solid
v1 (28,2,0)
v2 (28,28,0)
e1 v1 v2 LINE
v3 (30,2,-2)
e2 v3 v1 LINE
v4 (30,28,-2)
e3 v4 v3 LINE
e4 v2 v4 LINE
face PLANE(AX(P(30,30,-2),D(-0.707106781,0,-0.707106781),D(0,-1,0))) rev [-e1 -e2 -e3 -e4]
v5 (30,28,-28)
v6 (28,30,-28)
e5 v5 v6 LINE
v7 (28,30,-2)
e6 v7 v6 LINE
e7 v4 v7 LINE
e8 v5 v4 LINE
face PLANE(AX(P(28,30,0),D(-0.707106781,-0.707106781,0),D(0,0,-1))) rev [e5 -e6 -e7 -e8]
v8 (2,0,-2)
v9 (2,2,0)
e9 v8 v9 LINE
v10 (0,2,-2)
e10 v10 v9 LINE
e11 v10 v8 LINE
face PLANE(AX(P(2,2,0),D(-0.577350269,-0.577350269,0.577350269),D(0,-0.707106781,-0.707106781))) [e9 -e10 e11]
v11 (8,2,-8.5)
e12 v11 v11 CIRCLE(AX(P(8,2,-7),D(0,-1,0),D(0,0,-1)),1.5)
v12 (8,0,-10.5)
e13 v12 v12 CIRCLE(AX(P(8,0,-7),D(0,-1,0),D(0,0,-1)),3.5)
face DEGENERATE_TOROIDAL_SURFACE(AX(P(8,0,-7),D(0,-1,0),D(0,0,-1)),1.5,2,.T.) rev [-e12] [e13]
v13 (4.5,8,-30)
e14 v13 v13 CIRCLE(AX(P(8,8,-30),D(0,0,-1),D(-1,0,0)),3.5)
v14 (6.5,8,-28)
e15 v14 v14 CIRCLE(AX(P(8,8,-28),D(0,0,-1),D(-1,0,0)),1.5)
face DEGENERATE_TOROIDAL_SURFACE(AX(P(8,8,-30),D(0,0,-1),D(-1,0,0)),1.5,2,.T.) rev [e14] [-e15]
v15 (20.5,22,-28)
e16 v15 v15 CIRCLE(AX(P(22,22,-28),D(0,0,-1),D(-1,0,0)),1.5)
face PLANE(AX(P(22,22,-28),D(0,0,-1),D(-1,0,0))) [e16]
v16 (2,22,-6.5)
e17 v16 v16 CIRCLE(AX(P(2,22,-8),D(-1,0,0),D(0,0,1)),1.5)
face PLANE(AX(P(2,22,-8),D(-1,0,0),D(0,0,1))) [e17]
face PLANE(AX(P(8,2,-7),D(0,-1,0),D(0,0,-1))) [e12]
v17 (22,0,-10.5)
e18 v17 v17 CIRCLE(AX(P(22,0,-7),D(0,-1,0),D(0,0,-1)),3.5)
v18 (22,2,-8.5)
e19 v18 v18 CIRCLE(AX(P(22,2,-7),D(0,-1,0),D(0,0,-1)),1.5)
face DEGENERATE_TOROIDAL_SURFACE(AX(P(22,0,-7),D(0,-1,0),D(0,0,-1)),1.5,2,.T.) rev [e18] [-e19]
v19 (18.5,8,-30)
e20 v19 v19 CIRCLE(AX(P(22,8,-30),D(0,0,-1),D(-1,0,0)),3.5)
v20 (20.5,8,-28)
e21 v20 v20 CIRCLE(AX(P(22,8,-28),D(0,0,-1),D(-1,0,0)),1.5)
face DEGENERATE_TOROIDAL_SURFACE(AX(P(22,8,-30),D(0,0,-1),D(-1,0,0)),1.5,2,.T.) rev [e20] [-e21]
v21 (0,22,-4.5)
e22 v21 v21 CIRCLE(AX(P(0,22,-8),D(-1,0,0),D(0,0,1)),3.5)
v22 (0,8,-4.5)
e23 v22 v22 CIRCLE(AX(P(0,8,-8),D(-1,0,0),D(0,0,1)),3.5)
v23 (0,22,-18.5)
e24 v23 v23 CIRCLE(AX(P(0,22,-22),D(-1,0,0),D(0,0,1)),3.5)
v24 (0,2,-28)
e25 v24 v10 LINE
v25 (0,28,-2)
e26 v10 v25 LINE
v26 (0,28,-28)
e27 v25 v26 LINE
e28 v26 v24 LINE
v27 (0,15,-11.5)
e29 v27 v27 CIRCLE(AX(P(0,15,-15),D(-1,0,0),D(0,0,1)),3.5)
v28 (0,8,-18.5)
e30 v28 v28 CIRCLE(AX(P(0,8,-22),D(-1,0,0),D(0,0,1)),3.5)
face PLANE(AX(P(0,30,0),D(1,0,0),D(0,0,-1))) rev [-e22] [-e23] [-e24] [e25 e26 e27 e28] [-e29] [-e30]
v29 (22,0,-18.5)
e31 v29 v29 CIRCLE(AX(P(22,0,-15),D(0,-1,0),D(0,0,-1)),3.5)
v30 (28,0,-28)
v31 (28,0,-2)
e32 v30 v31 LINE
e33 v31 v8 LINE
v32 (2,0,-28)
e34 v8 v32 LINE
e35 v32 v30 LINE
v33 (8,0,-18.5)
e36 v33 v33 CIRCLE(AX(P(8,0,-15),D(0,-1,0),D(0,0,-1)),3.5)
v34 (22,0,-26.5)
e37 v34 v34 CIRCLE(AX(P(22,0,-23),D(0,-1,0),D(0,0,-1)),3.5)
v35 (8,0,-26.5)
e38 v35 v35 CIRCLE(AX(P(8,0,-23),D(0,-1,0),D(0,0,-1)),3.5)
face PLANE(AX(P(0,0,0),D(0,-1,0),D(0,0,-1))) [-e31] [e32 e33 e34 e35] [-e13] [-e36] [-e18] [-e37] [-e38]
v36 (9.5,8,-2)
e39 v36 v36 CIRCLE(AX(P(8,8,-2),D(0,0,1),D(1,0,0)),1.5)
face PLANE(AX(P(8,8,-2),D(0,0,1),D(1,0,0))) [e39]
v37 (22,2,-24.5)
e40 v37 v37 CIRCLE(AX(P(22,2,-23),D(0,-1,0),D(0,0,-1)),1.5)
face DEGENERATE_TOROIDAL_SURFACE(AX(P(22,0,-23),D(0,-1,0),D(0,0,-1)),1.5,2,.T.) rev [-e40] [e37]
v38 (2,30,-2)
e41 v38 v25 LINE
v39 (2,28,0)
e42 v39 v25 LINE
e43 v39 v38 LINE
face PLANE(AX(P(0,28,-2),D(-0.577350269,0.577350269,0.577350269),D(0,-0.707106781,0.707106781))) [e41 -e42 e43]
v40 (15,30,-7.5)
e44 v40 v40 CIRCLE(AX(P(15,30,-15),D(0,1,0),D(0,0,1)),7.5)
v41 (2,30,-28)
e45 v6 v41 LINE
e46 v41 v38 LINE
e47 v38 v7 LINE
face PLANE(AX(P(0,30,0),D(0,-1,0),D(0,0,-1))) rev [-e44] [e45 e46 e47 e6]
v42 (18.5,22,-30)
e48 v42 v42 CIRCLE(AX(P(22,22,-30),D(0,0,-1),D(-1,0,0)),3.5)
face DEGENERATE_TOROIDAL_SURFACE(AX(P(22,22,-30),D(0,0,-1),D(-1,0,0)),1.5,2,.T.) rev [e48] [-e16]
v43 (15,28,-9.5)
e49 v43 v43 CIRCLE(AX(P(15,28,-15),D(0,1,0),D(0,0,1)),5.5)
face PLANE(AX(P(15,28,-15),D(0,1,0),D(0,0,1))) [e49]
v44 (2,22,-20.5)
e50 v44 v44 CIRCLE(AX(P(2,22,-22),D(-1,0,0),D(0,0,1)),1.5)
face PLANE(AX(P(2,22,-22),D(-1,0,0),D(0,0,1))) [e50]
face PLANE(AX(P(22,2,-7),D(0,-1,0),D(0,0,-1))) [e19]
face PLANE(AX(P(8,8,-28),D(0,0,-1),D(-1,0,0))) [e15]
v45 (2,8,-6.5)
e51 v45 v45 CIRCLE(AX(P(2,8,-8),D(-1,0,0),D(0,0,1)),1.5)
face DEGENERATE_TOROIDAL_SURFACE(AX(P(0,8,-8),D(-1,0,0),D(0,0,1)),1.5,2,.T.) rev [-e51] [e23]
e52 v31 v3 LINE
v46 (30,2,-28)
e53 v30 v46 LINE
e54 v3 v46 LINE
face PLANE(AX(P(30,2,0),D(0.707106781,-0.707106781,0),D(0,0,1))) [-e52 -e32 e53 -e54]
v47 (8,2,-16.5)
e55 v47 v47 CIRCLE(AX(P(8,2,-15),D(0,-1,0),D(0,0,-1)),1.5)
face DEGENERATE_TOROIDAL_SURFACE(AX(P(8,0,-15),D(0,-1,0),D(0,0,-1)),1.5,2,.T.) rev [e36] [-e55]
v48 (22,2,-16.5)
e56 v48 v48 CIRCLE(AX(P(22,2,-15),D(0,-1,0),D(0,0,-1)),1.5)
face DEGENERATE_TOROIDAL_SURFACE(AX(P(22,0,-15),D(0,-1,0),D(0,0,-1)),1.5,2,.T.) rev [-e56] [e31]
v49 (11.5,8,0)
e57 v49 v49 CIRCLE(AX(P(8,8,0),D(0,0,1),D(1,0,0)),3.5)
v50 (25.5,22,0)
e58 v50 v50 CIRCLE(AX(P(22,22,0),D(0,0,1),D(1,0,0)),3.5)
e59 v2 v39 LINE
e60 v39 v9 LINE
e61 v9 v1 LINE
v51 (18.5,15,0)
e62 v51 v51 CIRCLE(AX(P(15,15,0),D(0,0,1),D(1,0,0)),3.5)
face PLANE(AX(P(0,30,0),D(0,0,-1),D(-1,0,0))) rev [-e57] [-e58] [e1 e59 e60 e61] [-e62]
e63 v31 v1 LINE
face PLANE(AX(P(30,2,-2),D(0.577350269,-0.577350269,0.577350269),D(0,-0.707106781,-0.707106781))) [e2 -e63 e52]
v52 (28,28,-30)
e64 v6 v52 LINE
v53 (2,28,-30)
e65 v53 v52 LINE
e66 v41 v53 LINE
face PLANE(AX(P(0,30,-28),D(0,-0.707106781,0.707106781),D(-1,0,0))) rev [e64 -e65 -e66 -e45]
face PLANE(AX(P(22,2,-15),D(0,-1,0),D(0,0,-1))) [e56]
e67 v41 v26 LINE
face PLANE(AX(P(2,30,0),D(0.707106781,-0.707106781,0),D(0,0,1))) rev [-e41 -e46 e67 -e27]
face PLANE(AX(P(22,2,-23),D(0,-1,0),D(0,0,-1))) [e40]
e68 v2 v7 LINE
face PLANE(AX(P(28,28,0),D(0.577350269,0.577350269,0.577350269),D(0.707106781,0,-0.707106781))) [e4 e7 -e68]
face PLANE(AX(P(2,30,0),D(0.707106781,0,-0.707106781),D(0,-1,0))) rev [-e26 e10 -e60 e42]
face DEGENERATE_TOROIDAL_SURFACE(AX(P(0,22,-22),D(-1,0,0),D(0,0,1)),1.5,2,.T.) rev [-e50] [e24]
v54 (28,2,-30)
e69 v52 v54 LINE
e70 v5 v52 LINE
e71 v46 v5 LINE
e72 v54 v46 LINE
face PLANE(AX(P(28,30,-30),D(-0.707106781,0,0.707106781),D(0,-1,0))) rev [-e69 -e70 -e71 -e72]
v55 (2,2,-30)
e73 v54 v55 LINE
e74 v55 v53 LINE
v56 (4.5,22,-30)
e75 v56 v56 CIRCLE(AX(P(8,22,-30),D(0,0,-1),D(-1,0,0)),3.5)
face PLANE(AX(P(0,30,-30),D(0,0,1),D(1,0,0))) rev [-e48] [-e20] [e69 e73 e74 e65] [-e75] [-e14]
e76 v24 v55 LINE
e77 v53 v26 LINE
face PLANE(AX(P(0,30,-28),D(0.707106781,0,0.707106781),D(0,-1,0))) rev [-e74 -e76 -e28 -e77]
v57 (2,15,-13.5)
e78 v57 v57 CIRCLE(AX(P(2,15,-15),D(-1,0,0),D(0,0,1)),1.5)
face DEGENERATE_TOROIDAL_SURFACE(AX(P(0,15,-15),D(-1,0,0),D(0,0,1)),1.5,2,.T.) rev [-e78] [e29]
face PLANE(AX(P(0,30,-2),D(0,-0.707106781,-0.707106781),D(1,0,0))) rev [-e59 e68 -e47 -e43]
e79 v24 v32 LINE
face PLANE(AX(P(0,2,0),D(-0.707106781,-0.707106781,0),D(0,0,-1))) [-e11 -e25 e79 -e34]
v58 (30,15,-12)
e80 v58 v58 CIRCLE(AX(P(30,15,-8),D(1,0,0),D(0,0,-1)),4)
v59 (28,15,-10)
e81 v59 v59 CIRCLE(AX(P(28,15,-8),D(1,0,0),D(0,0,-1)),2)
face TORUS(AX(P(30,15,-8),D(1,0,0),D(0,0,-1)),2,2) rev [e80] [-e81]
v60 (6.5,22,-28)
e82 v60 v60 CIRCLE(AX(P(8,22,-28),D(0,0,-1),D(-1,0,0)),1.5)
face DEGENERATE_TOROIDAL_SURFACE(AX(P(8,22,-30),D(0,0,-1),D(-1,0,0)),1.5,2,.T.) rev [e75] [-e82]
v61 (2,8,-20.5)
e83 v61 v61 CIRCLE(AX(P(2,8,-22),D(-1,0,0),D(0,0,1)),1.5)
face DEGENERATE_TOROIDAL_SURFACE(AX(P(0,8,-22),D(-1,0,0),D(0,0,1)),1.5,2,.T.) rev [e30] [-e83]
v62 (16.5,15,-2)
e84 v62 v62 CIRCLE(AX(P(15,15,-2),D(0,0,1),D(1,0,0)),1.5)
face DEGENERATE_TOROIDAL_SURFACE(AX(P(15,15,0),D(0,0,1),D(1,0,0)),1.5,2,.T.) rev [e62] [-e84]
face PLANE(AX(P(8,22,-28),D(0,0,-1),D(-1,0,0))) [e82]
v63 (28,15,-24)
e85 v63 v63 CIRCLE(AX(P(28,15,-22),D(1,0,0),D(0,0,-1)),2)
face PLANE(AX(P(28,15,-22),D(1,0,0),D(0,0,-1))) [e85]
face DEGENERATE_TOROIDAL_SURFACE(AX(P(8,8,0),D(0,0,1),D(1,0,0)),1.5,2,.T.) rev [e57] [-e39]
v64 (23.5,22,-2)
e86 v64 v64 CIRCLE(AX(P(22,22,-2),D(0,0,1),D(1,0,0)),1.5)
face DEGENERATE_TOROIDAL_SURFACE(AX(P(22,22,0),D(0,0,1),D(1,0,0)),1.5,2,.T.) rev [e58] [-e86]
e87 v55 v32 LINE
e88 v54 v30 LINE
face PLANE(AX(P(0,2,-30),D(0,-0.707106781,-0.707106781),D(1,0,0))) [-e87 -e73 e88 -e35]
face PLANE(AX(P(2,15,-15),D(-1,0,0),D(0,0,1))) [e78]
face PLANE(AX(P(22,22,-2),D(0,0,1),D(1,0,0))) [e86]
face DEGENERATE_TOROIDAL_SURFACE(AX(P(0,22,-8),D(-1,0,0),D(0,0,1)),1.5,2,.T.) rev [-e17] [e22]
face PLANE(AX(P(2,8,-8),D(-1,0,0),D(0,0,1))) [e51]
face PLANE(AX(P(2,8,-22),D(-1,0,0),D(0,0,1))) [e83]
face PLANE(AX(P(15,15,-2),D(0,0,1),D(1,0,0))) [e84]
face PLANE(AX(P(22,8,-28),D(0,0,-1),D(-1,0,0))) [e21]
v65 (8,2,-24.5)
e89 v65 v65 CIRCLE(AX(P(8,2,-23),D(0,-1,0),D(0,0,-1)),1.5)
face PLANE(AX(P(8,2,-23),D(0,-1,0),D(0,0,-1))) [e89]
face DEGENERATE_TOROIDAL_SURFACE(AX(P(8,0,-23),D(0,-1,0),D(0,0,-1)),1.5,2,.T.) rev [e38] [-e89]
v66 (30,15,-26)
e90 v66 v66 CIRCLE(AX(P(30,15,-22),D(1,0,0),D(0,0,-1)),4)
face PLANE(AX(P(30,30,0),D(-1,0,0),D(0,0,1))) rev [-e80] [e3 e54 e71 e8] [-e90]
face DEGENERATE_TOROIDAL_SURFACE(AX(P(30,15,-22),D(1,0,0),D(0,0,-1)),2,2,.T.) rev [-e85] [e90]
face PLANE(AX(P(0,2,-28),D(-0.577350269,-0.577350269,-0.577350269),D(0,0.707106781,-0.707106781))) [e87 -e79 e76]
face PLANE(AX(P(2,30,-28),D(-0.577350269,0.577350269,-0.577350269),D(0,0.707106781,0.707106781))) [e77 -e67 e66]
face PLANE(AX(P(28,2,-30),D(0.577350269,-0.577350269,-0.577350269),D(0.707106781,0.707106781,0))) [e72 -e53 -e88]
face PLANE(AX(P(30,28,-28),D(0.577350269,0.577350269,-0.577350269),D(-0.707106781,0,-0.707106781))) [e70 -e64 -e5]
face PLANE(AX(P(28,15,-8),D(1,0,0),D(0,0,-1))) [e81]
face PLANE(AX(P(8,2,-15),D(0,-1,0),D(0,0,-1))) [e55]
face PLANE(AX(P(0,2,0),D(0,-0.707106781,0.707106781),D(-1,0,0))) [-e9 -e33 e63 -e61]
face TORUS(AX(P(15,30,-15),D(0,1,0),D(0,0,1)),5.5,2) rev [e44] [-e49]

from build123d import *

# Parameters (mm, degrees)
SKETCH_2_W          = 30
SKETCH_2_H          = 30
EXTRUDE_1_DEPTH     = 30
CHAMFER_1_SIZE      = 2
SKETCH_3_R          = 7.5
CUT_EXTRUDE_1_DEPTH = 2
FILLET_1_R          = 2
SKETCH_4_R          = 3.5
CUT_EXTRUDE_2_DEPTH = 2
FILLET_2_R          = 2
SKETCH_6_R          = 3.5
CUT_EXTRUDE_3_DEPTH = 2
SKETCH_7_R          = 4
CUT_EXTRUDE_4_DEPTH = 2
FILLET_4_R          = 2
SKETCH_8_R          = 3.5
CUT_EXTRUDE_5_DEPTH = 2
FILLET_5_R          = 2
SKETCH_9_R          = 3.5
CUT_EXTRUDE_6_DEPTH = 2
SKETCH_12_R         = 3.5
CUT_EXTRUDE_7_DEPTH = 2
FILLET_7_R          = 2
CUT_EXTRUDE_START   = -2
SKETCH_13_R         = 3.5
CUT_EXTRUDE_9_DEPTH = 2
FILLET_8_R          = 2
FILLET_9_R          = 2


with BuildPart() as part:
    # ｽｹｯﾁ2 → ﾎﾞｽ - 押し出し1 (new body)
    with BuildSketch(Plane(origin=(0, 0, 0), x_dir=(1, 0, 0), z_dir=(0, 1, 0))):
        with Locations((15, 15)):
            Rectangle(SKETCH_2_W, SKETCH_2_H)
    extrude(amount=EXTRUDE_1_DEPTH)

    # 面取り1
    chamfer_1_edges = [part.edges().sort_by_distance(p)[0] for p in [
        (30, 30, -15),
        (15, 30, -30),
        (0, 30, -15),
        (15, 0, -30),
        (30, 0, -15),
        (15, 0, 0),
        (0, 0, -15),
        (0, 15, -30),
        (30, 15, -30),
        (30, 15, 0),
        (0, 15, 0),
        (15, 30, 0),
    ]]
    chamfer(chamfer_1_edges, length=CHAMFER_1_SIZE)

    # ｽｹｯﾁ3 → ｶｯﾄ - 押し出し1 (cut)
    with BuildSketch(Plane(origin=(0, 30, 0), x_dir=(1, 0, 0), z_dir=(0, 1, 0))):
        with Locations(Location((15, 15, 0), (0, 0, 270))):
            Circle(SKETCH_3_R)
    extrude(amount=-CUT_EXTRUDE_1_DEPTH, mode=Mode.SUBTRACT)

    # ﾌｨﾚｯﾄ1
    fillet_1_edges = [part.edges().sort_by_distance(p)[0] for p in [
        (15, 28, -22.5),
    ]]
    fillet(fillet_1_edges, radius=FILLET_1_R - 0.0001)  # a hair under: the kernel refuses the full size

    # ｽｹｯﾁ4 → ｶｯﾄ - 押し出し2 (cut)
    with BuildSketch(Plane.XY):
        with Locations((8, 8)):
            Circle(SKETCH_4_R)
        with Locations((15, 15)):
            Circle(SKETCH_4_R)
        with Locations((22, 22)):
            Circle(SKETCH_4_R)
    extrude(amount=-CUT_EXTRUDE_2_DEPTH, mode=Mode.SUBTRACT)

    # ﾌｨﾚｯﾄ2
    fillet_2_edges = [part.edges().sort_by_distance(p)[0] for p in [
        (11.5, 15, -2),
        (18.5, 22, -2),
        (4.5, 8, -2),
    ]]
    fillet(fillet_2_edges, radius=FILLET_2_R - 0.0001)  # a hair under: the kernel refuses the full size

    # ｽｹｯﾁ6 → ｶｯﾄ - 押し出し3 (cut)
    with BuildSketch(Plane(origin=(0, 0, -30), x_dir=(-1, 0, 0), z_dir=(0, 0, -1))):
        with Locations((-22, 8)):
            Circle(SKETCH_6_R)
        with Locations((-8, 22)):
            Circle(SKETCH_6_R)
    extrude(amount=-CUT_EXTRUDE_3_DEPTH, mode=Mode.SUBTRACT)

    # ｽｹｯﾁ7 → ｶｯﾄ - 押し出し4 (cut)
    with BuildSketch(Plane(origin=(30, 0, 0), x_dir=(0, 0, -1), z_dir=(1, 0, 0))):
        with Locations((8, 15)):
            Circle(SKETCH_7_R)
        with Locations((22, 15)):
            Circle(SKETCH_7_R)
    extrude(amount=-CUT_EXTRUDE_4_DEPTH, mode=Mode.SUBTRACT)

    # ﾌｨﾚｯﾄ4
    fillet_4_edges = [part.edges().sort_by_distance(p)[0] for p in [
        (28, 15, -18),
        (28, 15, -4),
    ]]
    fillet(fillet_4_edges, radius=FILLET_4_R - 0.0001)  # a hair under: the kernel refuses the full size

    # ｽｹｯﾁ8 → ｶｯﾄ - 押し出し5 (cut)
    with BuildSketch(Plane.ZY):
        with Locations((-22, 22)):
            Circle(SKETCH_8_R)
        with Locations((-8, 22)):
            Circle(SKETCH_8_R)
        with Locations((-22, 8)):
            Circle(SKETCH_8_R)
        with Locations((-8, 8)):
            Circle(SKETCH_8_R)
    extrude(amount=-CUT_EXTRUDE_5_DEPTH, mode=Mode.SUBTRACT)

    # ﾌｨﾚｯﾄ5
    fillet_5_edges = [part.edges().sort_by_distance(p)[0] for p in [
        (2, 22, -11.5),
        (2, 8, -25.5),
        (2, 8, -11.5),
        (2, 22, -25.5),
    ]]
    fillet(fillet_5_edges, radius=FILLET_5_R - 0.0001)  # a hair under: the kernel refuses the full size

    # ｽｹｯﾁ9 → ｶｯﾄ - 押し出し6 (cut)
    with BuildSketch(Plane.XZ):
        with Locations(Location((8, -7, 0), (0, 0, 270))):
            Circle(SKETCH_9_R)
        with Locations(Location((22, -7, 0), (0, 0, 270))):
            Circle(SKETCH_9_R)
        with Locations(Location((22, -23, 0), (0, 0, 270))):
            Circle(SKETCH_9_R)
        with Locations(Location((8, -23, 0), (0, 0, 270))):
            Circle(SKETCH_9_R)
        with Locations(Location((8, -15, 0), (0, 0, 270))):
            Circle(SKETCH_9_R)
        with Locations(Location((22, -15, 0), (0, 0, 270))):
            Circle(SKETCH_9_R)
    extrude(amount=-CUT_EXTRUDE_6_DEPTH, mode=Mode.SUBTRACT)

    # ｽｹｯﾁ12 → ｶｯﾄ - 押し出し7 (cut)
    with BuildSketch(Plane.ZY):
        with Locations((-15, 15)):
            Circle(SKETCH_12_R)
    extrude(amount=-CUT_EXTRUDE_7_DEPTH, mode=Mode.SUBTRACT)

    # ﾌｨﾚｯﾄ7
    fillet_7_edges = [part.edges().sort_by_distance(p)[0] for p in [
        (2, 15, -18.5),
    ]]
    fillet(fillet_7_edges, radius=FILLET_7_R - 0.0001)  # a hair under: the kernel refuses the full size

    # ｽｹｯﾁ13 → ｶｯﾄ - 押し出し9 (cut)
    with BuildSketch(Plane(origin=(0, 0, -30), x_dir=(-1, 0, 0), z_dir=(0, 0, -1)).offset(CUT_EXTRUDE_START)):
        with Locations((-22, 22)):
            Circle(SKETCH_13_R)
        with Locations((-8, 8)):
            Circle(SKETCH_13_R)
    extrude(amount=CUT_EXTRUDE_9_DEPTH, mode=Mode.SUBTRACT)

    # ﾌｨﾚｯﾄ8
    fillet_8_edges = [part.edges().sort_by_distance(p)[0] for p in [
        (25.5, 22, -28),
        (11.5, 8, -28),
        (25.5, 8, -28),
        (11.5, 22, -28),
    ]]
    fillet(fillet_8_edges, radius=FILLET_8_R - 0.0001)  # a hair under: the kernel refuses the full size

    # ﾌｨﾚｯﾄ9
    fillet_9_edges = [part.edges().sort_by_distance(p)[0] for p in [
        (8, 2, -3.5),
        (22, 2, -3.5),
        (22, 2, -19.5),
        (8, 2, -19.5),
        (22, 2, -11.5),
        (8, 2, -11.5),
    ]]
    fillet(fillet_9_edges, radius=FILLET_9_R - 0.0001)  # a hair under: the kernel refuses the full size


solid = part.part
